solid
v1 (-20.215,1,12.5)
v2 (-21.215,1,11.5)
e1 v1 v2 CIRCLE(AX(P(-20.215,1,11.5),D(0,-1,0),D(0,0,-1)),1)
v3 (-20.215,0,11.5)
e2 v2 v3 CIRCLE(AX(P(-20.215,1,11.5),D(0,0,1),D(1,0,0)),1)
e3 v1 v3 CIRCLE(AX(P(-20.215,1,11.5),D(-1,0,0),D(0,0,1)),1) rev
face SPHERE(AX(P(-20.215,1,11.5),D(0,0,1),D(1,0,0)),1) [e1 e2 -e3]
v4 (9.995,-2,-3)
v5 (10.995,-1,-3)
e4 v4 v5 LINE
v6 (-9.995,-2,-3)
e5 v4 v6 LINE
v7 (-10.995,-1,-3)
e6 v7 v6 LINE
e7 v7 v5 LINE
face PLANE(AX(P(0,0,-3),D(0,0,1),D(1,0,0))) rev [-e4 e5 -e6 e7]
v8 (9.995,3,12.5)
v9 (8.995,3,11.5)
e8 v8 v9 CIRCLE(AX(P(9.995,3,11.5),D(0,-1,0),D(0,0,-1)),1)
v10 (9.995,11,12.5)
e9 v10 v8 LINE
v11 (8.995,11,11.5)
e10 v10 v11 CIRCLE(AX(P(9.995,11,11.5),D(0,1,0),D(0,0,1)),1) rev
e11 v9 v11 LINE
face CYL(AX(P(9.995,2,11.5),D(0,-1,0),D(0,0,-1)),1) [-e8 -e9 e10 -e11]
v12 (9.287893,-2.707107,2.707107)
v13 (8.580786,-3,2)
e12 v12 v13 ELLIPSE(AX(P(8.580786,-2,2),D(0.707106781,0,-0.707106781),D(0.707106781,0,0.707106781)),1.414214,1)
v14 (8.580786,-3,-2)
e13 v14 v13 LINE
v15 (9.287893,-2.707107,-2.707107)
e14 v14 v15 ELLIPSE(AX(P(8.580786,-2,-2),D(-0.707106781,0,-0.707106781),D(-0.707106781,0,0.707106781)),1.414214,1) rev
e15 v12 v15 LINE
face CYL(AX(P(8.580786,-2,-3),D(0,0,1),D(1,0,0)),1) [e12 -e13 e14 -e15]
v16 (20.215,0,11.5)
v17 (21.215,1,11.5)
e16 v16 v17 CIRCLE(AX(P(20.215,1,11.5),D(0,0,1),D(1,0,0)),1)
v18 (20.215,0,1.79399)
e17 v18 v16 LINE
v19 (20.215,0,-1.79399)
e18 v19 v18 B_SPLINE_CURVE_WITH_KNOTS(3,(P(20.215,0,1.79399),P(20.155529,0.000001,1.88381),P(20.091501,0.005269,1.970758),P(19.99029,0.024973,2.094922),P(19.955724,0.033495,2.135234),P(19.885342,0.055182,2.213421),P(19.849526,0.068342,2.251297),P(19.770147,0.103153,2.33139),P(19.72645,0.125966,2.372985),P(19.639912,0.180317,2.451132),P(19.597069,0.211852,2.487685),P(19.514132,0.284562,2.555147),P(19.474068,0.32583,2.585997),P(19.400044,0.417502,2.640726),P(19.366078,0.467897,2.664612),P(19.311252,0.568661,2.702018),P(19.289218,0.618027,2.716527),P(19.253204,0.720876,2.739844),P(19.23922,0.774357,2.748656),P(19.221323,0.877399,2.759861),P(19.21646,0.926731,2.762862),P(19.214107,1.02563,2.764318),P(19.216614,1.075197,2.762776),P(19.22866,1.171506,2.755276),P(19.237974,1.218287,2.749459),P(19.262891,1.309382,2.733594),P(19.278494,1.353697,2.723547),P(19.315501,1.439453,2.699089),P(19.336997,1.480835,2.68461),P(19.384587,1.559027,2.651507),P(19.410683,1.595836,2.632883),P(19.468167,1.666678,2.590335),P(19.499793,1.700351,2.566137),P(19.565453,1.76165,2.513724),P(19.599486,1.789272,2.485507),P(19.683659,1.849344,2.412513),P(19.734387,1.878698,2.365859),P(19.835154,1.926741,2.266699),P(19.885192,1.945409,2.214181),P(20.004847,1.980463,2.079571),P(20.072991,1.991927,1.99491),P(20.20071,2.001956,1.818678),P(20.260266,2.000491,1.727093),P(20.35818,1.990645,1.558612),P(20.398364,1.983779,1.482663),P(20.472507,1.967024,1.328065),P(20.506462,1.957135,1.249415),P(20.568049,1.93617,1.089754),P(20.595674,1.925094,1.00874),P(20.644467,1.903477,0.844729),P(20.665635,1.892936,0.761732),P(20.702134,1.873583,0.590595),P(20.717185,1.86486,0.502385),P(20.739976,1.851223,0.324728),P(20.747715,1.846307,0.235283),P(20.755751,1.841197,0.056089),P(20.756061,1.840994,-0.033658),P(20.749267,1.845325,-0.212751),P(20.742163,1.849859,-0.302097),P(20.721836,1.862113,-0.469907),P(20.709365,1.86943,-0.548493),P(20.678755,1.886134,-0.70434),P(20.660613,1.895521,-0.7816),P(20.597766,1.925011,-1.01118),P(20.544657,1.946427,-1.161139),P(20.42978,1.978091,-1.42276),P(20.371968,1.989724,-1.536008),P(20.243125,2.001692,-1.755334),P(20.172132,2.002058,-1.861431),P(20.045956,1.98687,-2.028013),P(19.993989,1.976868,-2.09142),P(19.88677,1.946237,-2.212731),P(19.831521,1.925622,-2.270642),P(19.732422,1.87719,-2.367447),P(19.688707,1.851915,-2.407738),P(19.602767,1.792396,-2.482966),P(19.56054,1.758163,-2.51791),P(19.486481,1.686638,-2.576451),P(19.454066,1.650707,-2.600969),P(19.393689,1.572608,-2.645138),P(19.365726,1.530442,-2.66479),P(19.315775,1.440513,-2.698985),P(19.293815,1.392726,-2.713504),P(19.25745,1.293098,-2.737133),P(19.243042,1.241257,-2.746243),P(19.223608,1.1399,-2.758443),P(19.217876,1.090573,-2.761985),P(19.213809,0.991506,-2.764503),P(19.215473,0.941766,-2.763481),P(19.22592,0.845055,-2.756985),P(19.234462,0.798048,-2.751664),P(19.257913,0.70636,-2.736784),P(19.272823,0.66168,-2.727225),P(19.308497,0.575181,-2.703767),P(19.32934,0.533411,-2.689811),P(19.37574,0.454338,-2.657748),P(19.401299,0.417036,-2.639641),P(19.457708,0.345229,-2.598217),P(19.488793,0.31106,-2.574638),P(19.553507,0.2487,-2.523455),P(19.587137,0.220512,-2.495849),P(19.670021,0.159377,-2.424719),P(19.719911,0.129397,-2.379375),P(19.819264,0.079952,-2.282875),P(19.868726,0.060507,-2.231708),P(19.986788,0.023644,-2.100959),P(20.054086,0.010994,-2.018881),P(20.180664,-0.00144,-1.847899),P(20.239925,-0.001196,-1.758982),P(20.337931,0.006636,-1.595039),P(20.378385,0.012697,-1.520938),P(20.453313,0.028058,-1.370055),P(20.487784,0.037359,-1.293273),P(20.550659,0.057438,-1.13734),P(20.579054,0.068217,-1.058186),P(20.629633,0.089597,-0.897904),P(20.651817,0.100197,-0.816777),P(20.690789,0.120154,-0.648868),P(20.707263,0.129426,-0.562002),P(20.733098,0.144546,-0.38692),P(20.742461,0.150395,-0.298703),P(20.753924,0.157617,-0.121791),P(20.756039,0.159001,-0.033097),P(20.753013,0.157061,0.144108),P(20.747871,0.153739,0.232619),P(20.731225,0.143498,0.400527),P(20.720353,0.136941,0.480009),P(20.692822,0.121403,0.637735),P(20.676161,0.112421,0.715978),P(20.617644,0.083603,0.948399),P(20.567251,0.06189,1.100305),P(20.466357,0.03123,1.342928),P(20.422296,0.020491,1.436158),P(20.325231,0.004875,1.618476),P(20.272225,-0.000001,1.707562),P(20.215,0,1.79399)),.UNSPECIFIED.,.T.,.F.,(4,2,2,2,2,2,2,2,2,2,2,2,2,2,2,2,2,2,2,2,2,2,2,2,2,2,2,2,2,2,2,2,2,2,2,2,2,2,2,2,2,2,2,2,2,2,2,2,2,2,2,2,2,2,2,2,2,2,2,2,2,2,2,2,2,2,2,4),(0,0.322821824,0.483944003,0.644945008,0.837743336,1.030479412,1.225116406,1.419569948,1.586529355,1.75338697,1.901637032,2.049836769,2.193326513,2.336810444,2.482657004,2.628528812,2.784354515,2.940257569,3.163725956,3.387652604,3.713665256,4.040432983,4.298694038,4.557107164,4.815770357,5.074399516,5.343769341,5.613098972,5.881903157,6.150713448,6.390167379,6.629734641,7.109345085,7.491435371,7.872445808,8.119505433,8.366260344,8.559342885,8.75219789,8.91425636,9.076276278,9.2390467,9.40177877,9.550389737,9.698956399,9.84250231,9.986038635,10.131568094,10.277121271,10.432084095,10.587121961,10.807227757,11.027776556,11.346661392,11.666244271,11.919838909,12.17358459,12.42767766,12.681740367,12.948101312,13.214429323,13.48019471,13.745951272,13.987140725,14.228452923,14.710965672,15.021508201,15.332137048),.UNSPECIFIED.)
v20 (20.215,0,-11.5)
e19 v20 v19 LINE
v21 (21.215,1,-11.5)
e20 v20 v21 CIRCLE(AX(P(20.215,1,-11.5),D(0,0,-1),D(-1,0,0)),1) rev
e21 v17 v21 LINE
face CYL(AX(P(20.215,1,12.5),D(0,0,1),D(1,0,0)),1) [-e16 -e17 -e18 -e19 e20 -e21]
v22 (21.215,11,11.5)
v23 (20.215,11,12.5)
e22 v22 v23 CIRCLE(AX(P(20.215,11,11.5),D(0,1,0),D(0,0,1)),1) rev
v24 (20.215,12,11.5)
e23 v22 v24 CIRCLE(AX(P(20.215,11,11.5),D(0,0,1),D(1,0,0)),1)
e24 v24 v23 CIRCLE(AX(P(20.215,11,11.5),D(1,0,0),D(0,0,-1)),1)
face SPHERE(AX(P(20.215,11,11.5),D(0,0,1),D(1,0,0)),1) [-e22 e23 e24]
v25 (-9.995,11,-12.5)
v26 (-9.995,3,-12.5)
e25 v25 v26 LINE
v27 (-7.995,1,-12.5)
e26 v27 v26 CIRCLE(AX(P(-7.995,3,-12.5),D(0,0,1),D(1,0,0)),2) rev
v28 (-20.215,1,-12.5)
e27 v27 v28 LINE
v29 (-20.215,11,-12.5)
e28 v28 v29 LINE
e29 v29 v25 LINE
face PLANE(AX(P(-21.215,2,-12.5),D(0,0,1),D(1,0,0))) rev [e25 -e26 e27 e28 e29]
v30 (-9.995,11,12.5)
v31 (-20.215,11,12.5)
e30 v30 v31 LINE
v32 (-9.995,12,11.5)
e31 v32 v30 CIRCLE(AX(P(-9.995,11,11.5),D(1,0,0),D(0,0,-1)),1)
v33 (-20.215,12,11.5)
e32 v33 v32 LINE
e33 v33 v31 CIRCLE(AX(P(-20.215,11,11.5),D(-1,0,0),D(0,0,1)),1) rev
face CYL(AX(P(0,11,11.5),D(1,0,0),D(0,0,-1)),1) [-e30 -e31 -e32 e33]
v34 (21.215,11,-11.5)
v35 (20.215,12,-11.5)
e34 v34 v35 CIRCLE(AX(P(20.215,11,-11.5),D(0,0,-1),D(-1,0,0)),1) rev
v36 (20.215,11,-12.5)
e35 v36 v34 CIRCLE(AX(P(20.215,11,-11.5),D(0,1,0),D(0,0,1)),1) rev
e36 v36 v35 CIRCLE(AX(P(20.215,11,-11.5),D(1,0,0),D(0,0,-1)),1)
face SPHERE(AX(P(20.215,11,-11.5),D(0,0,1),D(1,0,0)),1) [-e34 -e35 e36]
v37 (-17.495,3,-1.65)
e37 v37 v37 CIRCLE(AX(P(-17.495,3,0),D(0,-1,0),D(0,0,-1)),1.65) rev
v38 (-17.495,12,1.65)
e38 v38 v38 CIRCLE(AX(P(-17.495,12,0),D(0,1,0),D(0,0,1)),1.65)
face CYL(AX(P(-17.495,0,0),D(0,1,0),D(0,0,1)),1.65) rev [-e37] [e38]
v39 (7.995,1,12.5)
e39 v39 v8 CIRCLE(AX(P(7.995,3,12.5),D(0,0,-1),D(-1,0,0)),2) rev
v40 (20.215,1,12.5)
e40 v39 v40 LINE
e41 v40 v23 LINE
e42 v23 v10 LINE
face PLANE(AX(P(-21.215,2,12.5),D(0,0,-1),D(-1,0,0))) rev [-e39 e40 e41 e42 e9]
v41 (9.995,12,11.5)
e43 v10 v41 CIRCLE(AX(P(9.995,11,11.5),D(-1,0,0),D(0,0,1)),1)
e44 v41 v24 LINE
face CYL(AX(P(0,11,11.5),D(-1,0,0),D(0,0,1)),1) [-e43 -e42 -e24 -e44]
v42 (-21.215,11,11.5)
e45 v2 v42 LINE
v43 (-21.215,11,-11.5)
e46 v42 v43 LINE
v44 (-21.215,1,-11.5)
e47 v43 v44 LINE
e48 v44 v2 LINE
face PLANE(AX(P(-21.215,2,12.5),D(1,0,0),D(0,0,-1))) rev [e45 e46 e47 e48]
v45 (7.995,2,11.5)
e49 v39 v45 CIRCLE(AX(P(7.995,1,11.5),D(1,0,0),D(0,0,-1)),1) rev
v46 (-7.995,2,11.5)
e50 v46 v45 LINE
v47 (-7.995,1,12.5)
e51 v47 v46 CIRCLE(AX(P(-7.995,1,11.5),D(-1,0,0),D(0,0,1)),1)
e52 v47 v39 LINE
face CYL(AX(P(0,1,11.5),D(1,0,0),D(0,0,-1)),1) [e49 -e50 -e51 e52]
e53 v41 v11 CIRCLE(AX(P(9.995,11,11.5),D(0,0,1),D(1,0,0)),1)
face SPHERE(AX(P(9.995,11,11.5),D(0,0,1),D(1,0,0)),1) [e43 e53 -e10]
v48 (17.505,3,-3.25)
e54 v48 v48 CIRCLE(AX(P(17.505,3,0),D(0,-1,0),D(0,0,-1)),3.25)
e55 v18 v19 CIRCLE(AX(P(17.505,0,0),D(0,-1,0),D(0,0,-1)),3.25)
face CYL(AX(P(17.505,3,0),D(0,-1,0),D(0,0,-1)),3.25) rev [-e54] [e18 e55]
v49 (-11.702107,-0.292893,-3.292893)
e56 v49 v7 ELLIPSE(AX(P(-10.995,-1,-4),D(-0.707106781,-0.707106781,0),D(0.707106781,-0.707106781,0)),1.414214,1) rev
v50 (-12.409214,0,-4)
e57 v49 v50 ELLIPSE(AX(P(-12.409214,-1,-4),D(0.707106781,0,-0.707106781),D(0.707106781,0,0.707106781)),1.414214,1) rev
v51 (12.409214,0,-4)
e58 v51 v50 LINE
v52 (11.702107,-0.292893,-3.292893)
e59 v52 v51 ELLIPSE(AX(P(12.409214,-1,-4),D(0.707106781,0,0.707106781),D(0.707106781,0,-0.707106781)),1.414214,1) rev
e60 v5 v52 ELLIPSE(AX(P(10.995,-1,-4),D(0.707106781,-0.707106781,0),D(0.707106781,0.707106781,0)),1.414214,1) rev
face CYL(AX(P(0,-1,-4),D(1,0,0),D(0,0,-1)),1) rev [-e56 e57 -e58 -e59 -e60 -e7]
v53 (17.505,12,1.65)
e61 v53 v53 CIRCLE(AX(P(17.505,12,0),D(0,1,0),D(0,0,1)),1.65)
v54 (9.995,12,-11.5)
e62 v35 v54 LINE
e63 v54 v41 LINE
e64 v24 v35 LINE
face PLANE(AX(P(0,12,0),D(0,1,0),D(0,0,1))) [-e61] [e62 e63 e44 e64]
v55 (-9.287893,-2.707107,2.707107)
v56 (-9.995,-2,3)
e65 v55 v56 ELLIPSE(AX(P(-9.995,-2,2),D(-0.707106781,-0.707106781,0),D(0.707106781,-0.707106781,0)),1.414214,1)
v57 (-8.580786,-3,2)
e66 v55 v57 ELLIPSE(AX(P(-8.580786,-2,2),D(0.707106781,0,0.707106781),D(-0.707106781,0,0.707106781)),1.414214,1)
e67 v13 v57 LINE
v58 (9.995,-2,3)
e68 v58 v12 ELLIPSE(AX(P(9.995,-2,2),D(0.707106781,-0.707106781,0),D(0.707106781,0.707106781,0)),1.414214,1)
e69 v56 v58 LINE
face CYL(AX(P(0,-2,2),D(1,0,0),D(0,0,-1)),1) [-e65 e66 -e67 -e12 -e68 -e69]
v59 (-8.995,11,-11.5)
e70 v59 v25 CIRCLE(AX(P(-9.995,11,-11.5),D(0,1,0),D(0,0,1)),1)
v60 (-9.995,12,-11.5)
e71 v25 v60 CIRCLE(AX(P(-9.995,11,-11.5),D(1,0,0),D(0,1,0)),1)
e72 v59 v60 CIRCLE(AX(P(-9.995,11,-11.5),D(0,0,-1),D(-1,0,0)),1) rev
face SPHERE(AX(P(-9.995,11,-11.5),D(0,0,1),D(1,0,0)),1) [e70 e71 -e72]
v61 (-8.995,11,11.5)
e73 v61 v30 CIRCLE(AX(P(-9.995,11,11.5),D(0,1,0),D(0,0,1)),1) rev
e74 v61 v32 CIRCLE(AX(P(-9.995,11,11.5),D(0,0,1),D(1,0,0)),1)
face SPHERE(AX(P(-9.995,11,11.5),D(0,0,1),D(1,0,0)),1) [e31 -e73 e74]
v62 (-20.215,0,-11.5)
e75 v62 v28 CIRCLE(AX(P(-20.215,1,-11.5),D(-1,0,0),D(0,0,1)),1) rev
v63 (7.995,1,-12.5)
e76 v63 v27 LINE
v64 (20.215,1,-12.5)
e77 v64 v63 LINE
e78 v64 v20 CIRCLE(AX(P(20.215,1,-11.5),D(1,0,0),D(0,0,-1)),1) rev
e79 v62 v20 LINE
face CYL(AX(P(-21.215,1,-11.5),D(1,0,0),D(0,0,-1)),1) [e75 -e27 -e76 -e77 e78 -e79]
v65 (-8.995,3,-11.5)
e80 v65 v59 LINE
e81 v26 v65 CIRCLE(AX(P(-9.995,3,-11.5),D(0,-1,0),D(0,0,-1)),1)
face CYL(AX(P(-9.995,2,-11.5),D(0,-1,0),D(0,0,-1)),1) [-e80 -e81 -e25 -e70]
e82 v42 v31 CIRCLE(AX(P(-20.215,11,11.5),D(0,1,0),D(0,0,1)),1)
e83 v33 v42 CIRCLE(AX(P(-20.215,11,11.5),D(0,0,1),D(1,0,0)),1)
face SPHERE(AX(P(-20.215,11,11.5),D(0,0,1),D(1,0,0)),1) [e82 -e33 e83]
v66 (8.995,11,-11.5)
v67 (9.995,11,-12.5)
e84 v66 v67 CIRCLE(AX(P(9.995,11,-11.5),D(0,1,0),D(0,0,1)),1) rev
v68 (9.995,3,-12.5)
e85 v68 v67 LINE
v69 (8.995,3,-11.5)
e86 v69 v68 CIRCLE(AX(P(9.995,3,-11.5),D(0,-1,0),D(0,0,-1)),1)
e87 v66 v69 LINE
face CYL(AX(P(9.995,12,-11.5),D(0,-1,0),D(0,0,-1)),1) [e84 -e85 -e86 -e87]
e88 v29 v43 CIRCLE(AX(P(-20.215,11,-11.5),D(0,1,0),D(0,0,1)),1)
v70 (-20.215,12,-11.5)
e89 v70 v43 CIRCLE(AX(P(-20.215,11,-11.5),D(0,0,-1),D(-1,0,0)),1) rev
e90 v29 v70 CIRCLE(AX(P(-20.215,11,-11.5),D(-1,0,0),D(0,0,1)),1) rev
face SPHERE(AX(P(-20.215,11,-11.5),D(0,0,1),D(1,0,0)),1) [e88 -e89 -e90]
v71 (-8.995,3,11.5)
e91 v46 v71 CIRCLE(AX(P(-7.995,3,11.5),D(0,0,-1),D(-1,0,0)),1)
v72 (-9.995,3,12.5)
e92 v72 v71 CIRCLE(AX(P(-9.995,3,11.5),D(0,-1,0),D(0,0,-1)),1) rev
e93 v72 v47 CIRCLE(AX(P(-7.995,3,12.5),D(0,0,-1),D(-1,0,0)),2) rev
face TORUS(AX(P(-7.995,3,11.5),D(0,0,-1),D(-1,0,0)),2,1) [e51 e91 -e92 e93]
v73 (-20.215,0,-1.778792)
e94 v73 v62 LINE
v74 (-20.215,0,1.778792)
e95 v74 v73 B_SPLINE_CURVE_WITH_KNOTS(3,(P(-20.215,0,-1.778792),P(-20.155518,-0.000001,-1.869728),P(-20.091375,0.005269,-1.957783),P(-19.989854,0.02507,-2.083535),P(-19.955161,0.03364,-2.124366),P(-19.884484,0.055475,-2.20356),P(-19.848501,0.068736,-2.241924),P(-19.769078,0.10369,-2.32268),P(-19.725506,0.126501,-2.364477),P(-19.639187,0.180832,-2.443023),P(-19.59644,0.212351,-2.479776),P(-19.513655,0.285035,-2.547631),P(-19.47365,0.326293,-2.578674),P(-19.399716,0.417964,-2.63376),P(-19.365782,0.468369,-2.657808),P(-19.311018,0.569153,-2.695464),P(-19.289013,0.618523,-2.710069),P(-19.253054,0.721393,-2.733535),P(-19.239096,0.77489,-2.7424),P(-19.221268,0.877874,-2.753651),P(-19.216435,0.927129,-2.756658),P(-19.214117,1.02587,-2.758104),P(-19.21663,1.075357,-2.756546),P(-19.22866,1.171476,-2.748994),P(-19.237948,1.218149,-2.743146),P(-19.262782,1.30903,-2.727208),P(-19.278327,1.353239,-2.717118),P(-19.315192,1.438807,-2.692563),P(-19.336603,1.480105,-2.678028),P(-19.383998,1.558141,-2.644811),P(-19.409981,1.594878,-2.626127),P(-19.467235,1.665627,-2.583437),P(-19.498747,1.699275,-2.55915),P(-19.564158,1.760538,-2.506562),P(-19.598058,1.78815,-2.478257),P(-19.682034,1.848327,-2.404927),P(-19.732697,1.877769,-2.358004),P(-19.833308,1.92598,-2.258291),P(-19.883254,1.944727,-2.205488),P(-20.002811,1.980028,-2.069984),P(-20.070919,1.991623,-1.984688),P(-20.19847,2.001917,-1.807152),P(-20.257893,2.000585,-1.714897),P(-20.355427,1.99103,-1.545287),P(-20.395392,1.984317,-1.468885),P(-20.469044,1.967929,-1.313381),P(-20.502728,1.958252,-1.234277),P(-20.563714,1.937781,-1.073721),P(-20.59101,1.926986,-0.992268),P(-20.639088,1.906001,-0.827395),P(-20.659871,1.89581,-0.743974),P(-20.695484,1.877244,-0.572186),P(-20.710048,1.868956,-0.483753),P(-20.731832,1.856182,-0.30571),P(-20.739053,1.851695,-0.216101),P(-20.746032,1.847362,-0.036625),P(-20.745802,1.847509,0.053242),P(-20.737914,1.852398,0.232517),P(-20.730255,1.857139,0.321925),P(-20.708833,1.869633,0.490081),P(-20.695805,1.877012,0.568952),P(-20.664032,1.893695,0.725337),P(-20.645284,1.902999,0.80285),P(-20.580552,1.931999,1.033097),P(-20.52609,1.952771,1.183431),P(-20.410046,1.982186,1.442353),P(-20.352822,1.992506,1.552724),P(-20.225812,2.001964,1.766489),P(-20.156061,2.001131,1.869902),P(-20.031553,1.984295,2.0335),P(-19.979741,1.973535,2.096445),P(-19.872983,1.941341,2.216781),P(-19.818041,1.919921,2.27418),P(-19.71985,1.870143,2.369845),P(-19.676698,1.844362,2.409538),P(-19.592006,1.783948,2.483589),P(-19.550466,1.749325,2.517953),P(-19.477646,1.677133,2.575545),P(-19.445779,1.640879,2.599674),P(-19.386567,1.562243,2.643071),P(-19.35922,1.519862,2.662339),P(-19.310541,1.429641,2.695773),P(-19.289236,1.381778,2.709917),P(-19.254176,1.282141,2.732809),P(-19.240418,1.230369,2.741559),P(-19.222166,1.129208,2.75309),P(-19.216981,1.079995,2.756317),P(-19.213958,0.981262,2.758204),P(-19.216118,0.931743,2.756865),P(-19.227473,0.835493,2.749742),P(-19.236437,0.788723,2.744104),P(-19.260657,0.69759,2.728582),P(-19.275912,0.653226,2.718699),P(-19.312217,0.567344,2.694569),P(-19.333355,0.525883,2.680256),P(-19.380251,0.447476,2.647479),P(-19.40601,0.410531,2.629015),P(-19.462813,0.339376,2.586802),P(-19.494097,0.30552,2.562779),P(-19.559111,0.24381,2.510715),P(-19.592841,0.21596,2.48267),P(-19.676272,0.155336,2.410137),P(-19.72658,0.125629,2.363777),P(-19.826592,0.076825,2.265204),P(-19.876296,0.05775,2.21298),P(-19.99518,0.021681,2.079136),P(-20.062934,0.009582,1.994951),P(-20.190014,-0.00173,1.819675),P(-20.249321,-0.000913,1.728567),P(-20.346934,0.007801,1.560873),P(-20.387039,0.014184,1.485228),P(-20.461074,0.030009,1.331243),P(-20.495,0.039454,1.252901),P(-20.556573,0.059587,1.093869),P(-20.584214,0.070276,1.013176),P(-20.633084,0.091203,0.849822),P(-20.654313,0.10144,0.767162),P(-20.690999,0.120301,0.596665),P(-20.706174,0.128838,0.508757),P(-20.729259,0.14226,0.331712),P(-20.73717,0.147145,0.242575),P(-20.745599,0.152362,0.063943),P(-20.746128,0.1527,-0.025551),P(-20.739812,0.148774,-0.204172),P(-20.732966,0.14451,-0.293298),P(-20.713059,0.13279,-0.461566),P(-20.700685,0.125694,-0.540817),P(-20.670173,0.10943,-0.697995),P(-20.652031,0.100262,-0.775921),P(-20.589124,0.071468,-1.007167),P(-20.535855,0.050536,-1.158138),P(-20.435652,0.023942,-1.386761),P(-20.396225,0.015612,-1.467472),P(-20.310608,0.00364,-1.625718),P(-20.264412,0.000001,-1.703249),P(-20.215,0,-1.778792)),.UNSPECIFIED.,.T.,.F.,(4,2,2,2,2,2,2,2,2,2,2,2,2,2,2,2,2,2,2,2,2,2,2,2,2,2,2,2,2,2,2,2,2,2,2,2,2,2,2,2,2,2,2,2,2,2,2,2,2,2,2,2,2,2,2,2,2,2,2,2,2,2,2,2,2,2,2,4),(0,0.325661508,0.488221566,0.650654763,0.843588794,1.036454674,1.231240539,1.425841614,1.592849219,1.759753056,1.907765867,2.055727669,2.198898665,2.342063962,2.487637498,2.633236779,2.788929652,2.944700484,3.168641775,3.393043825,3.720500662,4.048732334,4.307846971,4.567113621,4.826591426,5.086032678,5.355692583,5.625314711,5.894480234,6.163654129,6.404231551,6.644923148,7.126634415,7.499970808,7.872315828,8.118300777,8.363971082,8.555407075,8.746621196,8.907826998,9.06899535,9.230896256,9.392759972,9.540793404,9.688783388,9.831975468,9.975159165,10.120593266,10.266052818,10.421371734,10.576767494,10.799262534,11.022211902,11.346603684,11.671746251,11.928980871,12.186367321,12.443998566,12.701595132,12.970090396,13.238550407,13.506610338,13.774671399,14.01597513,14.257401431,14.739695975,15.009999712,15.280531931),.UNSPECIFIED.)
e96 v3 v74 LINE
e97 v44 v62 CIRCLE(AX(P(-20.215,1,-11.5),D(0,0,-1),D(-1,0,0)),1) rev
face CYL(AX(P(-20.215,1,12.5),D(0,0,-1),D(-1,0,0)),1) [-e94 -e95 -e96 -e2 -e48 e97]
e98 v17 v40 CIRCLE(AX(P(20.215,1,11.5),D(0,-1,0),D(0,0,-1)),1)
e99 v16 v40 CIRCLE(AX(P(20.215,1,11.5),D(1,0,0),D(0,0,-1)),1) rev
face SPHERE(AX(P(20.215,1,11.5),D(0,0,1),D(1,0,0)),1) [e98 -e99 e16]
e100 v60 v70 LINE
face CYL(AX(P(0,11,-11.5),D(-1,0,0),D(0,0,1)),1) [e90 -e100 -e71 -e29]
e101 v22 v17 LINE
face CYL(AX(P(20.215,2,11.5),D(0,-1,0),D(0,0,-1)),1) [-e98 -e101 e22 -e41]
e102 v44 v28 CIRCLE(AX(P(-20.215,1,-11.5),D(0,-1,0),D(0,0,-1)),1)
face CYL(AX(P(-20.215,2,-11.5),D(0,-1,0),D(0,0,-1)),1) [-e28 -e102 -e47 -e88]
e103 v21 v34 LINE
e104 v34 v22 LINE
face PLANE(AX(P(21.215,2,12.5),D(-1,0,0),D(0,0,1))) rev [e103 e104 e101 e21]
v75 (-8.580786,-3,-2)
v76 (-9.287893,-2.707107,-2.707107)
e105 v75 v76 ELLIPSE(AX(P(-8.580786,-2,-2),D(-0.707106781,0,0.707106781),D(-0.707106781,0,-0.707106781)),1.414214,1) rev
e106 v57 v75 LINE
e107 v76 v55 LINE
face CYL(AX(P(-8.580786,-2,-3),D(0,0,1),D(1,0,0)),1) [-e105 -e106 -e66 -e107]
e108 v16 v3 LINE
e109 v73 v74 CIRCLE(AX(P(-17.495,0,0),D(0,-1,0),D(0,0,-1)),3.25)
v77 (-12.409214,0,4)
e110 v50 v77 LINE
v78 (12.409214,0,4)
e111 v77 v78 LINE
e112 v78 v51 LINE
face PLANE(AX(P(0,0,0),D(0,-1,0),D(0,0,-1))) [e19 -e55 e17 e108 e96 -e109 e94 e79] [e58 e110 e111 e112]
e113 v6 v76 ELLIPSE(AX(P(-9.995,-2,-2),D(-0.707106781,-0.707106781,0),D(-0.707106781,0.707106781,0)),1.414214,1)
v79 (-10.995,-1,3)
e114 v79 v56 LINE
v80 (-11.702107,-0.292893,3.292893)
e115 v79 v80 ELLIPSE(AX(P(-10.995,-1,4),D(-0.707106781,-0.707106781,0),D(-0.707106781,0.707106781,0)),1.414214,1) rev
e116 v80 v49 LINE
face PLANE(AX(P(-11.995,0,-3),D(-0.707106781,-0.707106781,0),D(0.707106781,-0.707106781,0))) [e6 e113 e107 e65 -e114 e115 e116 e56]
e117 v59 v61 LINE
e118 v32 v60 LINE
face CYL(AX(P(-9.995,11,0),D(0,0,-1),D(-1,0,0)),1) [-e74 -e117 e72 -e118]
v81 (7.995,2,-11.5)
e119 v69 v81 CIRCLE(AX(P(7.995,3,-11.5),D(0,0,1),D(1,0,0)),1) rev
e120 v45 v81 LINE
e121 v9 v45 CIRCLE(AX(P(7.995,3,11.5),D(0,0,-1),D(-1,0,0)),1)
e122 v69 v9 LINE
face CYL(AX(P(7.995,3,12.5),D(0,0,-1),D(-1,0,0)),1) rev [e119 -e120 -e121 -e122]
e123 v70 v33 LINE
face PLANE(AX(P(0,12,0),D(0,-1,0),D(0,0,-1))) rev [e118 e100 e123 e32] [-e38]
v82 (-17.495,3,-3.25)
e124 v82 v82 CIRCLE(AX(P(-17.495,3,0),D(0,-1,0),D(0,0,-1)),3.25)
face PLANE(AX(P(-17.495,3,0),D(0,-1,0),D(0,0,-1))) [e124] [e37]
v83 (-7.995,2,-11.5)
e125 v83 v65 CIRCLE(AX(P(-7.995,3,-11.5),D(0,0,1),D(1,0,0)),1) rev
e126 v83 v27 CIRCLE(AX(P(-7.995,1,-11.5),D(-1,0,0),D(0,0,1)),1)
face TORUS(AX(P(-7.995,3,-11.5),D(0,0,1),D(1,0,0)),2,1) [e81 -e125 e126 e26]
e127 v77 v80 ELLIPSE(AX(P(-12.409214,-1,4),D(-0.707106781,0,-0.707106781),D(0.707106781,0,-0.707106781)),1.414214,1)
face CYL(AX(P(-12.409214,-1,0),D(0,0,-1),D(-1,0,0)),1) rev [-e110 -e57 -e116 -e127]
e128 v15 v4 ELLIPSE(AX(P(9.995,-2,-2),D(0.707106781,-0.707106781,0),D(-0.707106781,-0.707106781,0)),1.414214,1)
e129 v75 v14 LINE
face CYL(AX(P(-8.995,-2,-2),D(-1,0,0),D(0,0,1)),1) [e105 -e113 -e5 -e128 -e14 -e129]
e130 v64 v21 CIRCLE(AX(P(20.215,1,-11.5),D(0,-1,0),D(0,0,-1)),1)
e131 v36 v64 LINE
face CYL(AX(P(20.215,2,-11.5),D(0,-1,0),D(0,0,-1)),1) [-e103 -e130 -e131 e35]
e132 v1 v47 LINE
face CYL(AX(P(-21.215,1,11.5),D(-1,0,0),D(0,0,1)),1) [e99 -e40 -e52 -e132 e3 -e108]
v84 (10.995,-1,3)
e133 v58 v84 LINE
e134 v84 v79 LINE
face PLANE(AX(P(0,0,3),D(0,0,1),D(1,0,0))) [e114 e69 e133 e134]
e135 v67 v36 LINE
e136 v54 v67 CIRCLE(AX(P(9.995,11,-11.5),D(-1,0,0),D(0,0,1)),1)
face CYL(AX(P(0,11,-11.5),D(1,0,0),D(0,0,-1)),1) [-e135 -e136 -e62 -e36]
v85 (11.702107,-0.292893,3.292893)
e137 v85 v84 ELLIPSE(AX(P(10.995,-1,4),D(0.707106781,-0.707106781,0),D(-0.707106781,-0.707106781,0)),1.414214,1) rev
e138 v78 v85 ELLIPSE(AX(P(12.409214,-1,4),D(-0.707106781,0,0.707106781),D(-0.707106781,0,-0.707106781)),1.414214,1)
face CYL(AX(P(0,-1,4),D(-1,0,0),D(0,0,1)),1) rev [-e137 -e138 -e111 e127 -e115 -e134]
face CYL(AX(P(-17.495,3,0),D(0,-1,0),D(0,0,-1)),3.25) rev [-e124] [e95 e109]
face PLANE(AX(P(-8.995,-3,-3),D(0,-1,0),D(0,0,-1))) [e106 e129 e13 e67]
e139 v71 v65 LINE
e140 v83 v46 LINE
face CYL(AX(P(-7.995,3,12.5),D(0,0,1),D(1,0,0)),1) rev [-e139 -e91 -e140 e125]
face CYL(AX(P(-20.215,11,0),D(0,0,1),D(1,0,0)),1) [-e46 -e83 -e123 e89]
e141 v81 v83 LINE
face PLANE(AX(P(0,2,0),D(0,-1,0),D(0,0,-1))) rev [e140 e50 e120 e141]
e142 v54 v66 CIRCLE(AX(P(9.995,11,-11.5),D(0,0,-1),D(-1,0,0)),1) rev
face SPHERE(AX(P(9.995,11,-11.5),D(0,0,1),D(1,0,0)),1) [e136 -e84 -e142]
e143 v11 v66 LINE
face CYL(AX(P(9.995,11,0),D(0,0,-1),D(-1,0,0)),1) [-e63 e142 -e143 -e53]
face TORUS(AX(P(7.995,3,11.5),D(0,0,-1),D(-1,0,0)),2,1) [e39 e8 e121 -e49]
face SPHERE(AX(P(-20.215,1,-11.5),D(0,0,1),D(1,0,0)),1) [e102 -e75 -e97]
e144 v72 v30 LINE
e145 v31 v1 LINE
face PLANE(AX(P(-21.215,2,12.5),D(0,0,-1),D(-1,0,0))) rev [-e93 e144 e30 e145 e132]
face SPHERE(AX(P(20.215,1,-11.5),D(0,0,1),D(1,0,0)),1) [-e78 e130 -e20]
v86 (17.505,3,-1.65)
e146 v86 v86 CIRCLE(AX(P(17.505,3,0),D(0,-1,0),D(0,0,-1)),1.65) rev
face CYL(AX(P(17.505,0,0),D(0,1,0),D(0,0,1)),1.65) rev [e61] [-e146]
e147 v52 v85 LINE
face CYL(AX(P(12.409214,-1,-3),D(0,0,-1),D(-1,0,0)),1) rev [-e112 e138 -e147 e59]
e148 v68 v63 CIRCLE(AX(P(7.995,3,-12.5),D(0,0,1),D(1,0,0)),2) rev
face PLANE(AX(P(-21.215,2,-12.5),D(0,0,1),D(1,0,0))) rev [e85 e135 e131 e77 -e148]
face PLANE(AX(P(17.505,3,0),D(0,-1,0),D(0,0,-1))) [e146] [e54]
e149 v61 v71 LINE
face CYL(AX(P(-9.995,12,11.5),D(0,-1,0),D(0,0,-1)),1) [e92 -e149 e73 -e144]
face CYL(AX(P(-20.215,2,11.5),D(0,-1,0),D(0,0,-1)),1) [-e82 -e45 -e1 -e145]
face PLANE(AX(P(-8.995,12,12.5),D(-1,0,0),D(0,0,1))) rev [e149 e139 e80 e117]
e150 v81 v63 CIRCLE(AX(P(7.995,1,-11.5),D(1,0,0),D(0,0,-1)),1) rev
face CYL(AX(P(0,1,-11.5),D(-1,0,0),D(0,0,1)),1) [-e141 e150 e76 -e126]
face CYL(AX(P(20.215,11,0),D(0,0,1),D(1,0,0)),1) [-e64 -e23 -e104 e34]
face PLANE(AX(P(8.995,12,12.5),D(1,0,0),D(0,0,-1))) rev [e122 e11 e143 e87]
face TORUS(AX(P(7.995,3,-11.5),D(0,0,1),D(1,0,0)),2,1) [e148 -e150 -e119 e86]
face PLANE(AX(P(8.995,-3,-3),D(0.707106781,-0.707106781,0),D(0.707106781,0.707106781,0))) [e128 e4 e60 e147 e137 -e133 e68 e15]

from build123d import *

# Parameters (mm, degrees)
SKETCH_1_W           = 42.43
SKETCH_1_H           = 25
EXTRUDE_1_DEPTH      = 2
SKETCH_2_W           = 12.22
SKETCH_2_H           = 25
EXTRUDE_2_DEPTH      = 10
SKETCH_3_R           = 1.65
CUT_EXTRUDE_1_DEPTH  = 28.392083254
EXTRUDE_3_DEPTH      = 3
EXTRUDE_3_DEPTH_BACK = 3
FILLET_2_R           = 1
SKETCH_5_R           = 3.25
CUT_EXTRUDE_2_DEPTH  = 3


with BuildPart() as part:
    # ｽｹｯﾁ1 → ﾎﾞｽ - 押し出し1 (new body)
    with BuildSketch(Plane(origin=(0, 0, 0), x_dir=(1, 0, 0), z_dir=(0, 1, 0))):
        Rectangle(SKETCH_1_W, SKETCH_1_H)
    extrude(amount=EXTRUDE_1_DEPTH)

    # ｽｹｯﾁ2 → ﾎﾞｽ - 押し出し2 (add)
    with BuildSketch(Plane(origin=(0, 2, 0), x_dir=(1, 0, 0), z_dir=(0, 1, 0))):
        with Locations((-15.105, 0)):
            Rectangle(SKETCH_2_W, SKETCH_2_H)
        with Locations((15.105, 0)):
            Rectangle(SKETCH_2_W, SKETCH_2_H)
    extrude(amount=EXTRUDE_2_DEPTH)

    # ｽｹｯﾁ3 → ｶｯﾄ - 押し出し1 (cut, through all)
    with BuildSketch(Plane(origin=(0, 12, 0), x_dir=(1, 0, 0), z_dir=(0, 1, 0))):
        with Locations(Location((-17.495, 0, 0), (0, 0, 270))):
            Circle(SKETCH_3_R)
        with Locations(Location((17.505, 0, 0), (0, 0, 270))):
            Circle(SKETCH_3_R)
    extrude(amount=-CUT_EXTRUDE_1_DEPTH, mode=Mode.SUBTRACT)

    # ｽｹｯﾁ4 → ﾎﾞｽ - 押し出し3 (add, two sides: drawn at the far end of the back side and taken through both)
    with BuildSketch(Plane.XY.offset(-EXTRUDE_3_DEPTH_BACK)):
        Polygon((-11.995, 0), (-8.995, -3), (8.995, -3), (11.995, 0), align=None)
    extrude(amount=EXTRUDE_3_DEPTH + EXTRUDE_3_DEPTH_BACK)

    # ﾌｨﾚｯﾄ2
    fillet_2_edges = [part.edges().sort_by_distance(p)[0] for p in [
        (0, 2, 12.5),
        (-8.995, 2, 0),
        (-8.995, 7, 12.5),
        (-8.995, 7, -12.5),
        (-21.215, 12, 0),
        (-15.105, 12, 12.5),
        (-8.995, 12, 0),
        (-15.105, 12, -12.5),
        (0, 2, -12.5),
        (8.995, 2, 0),
        (8.995, 7, -12.5),
        (8.995, 7, 12.5),
        (21.215, 12, 0),
        (15.105, 12, -12.5),
        (8.995, 12, 0),
        (15.105, 12, 12.5),
        (-8.995, -3, 0),
        (-11.995, 0, 0),
        (0, 0, 3),
        (11.995, 0, 0),
        (0, 0, 12.5),
        (8.995, -3, 0),
        (0, -3, -3),
        (0, 0, -3),
        (0, -3, 3),
        (-21.215, 0, 0),
        (0, 0, -12.5),
        (21.215, 0, 0),
        (21.215, 6, 12.5),
        (-21.215, 6, 12.5),
        (-21.215, 6, -12.5),
        (21.215, 6, -12.5),
    ]]
    fillet(fillet_2_edges, radius=FILLET_2_R - 0.0001)  # a hair under: the kernel refuses the full size

    # ｽｹｯﾁ5 → ｶｯﾄ - 押し出し2 (cut)
    with BuildSketch(Plane(origin=(0, 0, 0), x_dir=(-1, 0, 0), z_dir=(0, -1, 0))):
        with Locations(Location((-17.505, 0, 0), (0, 0, 90))):
            Circle(SKETCH_5_R)
        with Locations(Location((17.495, 0, 0), (0, 0, 90))):
            Circle(SKETCH_5_R)
    extrude(amount=-CUT_EXTRUDE_2_DEPTH, mode=Mode.SUBTRACT)


solid = part.part
